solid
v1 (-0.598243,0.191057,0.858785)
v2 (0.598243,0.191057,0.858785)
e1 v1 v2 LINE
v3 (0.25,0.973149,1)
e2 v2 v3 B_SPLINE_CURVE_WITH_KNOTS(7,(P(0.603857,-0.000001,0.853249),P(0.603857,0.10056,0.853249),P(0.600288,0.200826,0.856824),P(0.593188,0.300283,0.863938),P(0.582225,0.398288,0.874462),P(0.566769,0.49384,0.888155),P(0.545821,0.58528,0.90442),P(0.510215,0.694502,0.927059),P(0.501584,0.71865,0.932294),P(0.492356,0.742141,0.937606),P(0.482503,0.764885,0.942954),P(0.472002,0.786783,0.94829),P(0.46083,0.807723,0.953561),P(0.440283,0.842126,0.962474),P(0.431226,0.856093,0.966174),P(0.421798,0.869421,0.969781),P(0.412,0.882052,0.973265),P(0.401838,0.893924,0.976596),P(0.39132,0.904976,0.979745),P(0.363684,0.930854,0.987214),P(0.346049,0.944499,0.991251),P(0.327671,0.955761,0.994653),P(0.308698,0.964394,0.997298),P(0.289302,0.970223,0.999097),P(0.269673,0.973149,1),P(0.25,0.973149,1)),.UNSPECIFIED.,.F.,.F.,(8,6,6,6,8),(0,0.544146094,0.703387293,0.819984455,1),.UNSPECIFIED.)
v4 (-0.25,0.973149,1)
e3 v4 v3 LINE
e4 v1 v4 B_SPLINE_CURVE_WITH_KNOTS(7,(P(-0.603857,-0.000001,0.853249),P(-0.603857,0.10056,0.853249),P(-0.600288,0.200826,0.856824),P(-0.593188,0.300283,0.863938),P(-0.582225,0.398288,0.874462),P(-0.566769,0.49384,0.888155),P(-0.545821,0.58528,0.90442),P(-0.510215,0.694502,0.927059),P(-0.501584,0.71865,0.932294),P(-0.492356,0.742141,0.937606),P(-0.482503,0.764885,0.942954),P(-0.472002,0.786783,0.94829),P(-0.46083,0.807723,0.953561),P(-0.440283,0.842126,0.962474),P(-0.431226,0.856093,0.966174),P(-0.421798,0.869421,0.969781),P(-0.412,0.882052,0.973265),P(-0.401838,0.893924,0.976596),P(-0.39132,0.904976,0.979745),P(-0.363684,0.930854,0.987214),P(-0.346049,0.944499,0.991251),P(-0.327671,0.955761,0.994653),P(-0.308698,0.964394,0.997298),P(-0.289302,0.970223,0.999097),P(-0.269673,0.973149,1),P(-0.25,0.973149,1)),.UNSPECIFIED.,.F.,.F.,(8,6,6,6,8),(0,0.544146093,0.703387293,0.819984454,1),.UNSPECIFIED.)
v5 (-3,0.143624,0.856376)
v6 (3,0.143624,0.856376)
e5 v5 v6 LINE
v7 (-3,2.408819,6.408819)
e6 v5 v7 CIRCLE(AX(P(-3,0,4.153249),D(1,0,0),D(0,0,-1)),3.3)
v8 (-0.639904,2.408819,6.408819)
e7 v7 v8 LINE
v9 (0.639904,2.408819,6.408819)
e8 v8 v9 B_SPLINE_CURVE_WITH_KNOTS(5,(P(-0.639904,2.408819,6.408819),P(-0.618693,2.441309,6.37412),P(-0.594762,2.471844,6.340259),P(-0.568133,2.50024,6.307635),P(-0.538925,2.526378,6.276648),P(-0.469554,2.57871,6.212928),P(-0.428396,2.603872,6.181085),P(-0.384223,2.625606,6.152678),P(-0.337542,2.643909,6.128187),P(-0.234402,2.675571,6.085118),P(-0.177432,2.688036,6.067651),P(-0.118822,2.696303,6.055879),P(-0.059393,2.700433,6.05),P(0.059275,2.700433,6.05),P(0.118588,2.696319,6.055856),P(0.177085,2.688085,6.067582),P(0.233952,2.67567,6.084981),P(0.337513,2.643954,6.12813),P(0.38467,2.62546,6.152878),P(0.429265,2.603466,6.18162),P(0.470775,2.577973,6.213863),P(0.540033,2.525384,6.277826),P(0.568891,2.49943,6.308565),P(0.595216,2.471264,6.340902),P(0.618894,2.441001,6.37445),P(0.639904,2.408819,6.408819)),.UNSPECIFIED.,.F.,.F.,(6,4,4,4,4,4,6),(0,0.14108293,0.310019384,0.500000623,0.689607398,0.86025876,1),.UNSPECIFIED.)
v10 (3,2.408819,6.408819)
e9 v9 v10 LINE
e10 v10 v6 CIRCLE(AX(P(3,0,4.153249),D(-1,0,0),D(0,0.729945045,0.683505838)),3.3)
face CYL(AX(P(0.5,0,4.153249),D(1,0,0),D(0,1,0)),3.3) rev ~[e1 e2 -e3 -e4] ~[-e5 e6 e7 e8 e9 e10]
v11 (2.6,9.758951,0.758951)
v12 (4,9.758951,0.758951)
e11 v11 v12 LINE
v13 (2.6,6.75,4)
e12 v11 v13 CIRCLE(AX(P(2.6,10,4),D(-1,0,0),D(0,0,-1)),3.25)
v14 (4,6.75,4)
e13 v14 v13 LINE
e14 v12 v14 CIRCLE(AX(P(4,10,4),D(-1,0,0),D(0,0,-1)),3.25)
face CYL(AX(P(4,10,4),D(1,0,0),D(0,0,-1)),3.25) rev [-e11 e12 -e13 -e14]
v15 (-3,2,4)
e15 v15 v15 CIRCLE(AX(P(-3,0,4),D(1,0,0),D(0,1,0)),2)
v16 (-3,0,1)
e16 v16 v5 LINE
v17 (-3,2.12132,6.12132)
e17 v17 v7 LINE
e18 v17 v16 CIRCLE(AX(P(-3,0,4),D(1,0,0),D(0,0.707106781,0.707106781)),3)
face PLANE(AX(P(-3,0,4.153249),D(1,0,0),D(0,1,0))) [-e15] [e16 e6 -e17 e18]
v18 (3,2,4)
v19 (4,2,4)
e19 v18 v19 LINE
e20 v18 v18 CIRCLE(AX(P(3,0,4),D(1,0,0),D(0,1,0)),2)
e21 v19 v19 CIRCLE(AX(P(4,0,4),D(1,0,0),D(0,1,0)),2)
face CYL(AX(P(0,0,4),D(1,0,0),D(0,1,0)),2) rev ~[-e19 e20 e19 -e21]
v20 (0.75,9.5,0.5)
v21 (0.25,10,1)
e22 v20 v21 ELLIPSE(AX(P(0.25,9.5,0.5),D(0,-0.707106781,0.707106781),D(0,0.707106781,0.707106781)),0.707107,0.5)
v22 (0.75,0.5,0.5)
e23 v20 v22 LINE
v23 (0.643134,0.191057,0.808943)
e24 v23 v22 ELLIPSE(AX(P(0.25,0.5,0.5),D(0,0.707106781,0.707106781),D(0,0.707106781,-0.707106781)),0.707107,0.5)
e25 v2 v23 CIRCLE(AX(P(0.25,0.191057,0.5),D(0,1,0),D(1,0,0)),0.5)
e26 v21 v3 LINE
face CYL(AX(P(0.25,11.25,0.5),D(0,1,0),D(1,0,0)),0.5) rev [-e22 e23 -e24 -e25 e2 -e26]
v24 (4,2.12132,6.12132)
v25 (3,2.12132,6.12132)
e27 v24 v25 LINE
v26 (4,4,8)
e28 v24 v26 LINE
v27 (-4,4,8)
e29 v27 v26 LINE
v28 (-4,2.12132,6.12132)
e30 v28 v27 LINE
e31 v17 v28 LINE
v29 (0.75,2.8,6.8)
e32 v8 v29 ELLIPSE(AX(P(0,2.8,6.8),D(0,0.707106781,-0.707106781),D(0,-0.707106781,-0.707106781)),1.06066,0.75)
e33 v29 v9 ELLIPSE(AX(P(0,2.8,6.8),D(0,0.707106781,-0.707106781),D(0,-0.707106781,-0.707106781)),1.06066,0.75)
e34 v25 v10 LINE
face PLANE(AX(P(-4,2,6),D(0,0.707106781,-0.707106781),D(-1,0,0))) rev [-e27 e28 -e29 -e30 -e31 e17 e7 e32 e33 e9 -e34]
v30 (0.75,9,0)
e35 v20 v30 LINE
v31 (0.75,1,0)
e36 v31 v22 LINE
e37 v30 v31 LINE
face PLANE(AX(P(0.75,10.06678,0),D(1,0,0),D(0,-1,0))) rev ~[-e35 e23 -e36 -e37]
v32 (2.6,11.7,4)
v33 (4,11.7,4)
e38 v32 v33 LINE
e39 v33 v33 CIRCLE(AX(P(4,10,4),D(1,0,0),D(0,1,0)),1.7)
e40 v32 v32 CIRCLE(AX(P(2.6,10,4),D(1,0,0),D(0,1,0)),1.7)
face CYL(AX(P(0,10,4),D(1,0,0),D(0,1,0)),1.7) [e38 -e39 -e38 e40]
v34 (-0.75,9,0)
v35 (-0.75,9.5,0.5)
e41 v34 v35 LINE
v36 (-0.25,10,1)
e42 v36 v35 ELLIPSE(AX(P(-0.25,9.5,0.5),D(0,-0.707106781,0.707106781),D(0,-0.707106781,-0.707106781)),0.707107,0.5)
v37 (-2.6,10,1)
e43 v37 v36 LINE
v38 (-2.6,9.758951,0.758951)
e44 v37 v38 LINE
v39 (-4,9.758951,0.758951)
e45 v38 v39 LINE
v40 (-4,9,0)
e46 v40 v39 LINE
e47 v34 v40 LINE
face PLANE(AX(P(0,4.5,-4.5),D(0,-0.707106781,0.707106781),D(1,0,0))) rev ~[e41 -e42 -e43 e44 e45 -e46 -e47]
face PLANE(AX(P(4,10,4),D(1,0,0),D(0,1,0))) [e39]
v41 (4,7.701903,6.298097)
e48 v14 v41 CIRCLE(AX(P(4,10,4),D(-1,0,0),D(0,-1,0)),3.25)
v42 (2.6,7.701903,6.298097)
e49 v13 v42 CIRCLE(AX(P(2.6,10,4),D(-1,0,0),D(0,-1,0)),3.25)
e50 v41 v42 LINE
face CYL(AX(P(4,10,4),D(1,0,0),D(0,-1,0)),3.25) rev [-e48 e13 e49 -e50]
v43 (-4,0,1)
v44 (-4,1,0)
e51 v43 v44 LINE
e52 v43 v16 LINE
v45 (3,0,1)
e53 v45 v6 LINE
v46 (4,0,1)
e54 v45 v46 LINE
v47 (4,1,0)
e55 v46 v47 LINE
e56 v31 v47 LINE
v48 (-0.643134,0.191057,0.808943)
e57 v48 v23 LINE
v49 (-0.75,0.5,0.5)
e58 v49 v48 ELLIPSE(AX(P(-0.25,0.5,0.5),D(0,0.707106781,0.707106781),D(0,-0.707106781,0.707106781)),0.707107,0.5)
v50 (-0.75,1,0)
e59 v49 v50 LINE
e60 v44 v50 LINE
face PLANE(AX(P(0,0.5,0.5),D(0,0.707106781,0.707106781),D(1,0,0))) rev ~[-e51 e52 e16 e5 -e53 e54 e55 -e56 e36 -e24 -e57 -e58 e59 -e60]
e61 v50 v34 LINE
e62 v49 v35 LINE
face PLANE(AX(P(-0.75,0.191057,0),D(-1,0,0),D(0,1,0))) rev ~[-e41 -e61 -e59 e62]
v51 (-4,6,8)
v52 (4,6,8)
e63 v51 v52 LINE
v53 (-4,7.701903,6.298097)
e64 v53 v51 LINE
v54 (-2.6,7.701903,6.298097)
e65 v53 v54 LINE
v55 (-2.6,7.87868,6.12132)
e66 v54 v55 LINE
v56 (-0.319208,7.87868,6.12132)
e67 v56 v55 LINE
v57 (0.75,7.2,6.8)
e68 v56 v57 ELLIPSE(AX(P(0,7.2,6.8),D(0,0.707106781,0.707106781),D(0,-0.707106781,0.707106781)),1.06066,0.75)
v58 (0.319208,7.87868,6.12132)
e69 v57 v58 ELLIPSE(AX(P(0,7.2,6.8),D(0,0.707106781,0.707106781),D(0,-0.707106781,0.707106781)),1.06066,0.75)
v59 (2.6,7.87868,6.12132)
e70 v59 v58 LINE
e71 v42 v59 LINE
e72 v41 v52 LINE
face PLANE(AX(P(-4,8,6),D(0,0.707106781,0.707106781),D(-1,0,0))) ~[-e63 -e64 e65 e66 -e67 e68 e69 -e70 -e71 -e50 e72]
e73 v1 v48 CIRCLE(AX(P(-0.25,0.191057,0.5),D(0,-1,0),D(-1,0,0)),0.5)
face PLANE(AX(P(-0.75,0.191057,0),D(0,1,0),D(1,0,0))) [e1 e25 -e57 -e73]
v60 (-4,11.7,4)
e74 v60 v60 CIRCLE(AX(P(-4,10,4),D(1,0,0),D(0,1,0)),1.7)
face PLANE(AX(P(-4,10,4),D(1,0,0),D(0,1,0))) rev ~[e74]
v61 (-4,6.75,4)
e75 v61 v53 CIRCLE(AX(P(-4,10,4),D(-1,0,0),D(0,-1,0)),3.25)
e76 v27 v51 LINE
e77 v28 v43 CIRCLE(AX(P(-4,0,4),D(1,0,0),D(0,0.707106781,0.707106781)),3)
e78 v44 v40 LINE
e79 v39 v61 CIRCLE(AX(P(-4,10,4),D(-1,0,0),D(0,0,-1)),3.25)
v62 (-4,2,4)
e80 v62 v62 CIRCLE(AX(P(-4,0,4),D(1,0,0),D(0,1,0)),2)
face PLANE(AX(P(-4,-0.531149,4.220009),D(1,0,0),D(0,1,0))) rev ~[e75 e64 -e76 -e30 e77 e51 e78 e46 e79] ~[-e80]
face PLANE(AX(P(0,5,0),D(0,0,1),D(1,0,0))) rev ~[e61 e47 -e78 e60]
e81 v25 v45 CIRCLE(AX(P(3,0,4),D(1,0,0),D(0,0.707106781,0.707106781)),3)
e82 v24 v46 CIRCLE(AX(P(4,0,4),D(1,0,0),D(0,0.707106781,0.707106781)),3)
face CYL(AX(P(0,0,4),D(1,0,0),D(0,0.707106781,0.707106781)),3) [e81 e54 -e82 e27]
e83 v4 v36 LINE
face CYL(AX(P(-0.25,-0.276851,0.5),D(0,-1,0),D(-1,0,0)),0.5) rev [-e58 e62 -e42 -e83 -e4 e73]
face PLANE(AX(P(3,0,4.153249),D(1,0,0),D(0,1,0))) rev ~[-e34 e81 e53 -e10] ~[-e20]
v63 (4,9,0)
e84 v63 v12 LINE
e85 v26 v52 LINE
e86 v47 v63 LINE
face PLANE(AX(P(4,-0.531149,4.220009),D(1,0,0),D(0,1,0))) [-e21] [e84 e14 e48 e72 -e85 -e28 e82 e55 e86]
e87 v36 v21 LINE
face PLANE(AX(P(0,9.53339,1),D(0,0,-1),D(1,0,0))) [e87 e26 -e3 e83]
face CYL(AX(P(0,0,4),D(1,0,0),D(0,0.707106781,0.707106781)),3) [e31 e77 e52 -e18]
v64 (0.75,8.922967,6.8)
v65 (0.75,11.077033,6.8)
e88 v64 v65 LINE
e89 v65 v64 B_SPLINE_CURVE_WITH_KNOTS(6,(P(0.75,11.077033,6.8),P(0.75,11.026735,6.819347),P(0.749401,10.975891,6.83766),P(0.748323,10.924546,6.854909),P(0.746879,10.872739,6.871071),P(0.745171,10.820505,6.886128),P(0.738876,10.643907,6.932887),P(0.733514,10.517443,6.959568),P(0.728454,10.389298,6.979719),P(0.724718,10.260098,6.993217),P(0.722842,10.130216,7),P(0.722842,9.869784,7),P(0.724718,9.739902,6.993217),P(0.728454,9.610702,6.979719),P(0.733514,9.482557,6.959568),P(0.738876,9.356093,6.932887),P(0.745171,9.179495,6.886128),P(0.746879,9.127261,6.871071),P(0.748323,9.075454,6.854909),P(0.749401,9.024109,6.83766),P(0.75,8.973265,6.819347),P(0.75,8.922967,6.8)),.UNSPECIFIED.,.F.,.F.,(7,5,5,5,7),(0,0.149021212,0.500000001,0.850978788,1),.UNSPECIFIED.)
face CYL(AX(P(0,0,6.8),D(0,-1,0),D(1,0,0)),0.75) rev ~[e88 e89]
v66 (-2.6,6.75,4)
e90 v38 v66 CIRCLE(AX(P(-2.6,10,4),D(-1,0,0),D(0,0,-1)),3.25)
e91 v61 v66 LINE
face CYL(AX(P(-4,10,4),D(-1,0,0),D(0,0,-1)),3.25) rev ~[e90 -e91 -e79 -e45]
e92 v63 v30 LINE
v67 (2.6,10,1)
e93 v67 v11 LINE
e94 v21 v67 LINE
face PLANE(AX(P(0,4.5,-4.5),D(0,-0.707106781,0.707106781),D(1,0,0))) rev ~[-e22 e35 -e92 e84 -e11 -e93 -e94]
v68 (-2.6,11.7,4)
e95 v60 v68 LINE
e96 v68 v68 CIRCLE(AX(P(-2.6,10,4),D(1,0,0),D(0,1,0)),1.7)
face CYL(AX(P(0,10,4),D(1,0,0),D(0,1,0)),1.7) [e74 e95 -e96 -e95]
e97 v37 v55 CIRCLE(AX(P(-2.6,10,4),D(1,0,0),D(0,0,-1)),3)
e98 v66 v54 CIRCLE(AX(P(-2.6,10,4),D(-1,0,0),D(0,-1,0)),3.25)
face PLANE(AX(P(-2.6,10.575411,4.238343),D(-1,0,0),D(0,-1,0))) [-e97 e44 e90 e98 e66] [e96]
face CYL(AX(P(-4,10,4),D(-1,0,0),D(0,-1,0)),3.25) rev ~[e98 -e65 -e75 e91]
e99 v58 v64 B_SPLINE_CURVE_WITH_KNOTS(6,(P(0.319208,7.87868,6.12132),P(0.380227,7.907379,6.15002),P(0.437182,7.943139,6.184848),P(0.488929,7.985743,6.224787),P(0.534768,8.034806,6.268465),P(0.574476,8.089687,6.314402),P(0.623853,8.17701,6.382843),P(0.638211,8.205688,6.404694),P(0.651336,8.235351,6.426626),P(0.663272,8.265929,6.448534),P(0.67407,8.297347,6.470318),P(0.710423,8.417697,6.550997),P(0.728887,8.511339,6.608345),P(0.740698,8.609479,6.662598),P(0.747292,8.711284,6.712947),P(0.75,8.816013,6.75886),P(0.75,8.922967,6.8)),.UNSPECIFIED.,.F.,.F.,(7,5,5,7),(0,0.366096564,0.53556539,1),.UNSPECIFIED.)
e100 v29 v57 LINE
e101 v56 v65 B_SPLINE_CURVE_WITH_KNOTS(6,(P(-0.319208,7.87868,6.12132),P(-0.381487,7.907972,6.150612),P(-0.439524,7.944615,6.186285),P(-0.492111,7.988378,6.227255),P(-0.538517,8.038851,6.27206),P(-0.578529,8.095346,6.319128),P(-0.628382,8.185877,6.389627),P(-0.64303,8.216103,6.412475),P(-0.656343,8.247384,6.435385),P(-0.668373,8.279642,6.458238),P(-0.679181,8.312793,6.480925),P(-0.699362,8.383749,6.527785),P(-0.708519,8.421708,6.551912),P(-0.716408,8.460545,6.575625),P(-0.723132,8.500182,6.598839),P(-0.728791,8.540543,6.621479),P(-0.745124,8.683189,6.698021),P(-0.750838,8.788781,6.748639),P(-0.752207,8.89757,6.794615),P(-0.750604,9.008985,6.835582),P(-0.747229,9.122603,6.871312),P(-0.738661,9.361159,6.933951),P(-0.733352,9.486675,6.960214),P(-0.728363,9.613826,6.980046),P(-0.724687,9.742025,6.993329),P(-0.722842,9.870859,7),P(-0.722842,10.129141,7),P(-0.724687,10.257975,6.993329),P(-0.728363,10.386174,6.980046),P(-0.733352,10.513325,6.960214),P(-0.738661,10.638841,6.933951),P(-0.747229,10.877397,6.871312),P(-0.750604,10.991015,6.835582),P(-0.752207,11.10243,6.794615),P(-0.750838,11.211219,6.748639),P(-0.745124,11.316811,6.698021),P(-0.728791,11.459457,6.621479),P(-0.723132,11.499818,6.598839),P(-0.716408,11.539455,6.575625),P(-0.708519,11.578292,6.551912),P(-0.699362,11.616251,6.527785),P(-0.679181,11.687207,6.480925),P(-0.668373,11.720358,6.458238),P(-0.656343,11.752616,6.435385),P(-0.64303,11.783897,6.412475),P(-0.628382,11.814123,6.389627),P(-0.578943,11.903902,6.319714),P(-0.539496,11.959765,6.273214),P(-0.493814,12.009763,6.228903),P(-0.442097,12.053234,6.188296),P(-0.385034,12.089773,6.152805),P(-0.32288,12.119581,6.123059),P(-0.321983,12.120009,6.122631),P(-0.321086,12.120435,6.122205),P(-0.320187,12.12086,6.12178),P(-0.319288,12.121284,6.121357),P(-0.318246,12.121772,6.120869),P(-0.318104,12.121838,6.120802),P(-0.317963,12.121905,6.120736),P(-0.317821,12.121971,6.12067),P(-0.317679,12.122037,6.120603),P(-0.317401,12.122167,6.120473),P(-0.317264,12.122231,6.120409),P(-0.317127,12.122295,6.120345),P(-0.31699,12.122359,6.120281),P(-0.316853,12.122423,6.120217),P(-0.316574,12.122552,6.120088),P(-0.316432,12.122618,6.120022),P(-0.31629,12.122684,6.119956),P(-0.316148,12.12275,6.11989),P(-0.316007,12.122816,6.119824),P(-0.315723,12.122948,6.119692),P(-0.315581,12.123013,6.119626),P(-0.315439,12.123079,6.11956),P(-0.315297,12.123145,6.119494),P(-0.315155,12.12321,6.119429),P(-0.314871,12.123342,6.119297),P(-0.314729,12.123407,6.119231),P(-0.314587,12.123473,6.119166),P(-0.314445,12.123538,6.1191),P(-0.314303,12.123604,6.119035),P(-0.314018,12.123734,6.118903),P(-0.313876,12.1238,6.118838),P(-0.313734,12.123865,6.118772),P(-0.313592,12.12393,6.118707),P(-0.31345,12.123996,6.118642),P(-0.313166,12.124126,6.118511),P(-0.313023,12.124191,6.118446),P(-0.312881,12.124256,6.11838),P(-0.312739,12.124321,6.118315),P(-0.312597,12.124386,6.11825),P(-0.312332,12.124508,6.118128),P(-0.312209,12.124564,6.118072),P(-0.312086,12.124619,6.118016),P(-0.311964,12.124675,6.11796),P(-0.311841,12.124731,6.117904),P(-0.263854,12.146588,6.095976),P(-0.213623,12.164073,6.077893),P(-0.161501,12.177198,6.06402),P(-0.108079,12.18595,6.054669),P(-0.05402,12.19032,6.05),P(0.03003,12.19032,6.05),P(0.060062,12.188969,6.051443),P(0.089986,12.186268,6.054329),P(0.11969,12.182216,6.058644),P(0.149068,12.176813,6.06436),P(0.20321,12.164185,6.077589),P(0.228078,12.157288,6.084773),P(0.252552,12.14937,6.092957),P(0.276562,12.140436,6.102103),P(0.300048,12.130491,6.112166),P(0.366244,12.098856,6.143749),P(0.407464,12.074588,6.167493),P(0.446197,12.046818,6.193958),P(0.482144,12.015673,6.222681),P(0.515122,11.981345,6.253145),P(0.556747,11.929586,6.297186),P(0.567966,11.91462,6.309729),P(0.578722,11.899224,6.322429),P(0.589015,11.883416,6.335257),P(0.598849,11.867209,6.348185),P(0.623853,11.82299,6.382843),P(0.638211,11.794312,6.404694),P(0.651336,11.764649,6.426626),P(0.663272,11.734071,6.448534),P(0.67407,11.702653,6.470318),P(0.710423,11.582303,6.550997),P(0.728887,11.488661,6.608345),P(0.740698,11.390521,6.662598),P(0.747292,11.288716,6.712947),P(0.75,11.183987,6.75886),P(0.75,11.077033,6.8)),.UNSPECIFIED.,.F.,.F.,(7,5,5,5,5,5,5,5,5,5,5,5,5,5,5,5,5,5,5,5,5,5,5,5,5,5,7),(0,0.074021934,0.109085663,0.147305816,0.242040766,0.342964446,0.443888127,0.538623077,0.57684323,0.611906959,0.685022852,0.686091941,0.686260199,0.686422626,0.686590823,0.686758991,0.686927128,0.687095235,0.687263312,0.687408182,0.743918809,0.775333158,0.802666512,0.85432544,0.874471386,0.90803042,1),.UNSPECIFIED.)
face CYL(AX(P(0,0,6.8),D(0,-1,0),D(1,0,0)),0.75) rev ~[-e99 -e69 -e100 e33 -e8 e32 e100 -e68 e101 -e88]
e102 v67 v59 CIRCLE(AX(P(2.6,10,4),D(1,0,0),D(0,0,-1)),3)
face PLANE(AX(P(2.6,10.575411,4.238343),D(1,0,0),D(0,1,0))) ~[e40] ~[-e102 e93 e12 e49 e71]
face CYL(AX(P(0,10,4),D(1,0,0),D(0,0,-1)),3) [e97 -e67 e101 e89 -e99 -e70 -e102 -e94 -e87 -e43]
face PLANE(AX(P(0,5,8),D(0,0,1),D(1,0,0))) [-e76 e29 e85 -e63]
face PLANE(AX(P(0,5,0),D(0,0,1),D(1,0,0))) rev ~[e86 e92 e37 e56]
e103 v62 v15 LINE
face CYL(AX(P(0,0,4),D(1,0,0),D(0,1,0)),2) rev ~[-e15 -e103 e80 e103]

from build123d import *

# Parameters (mm, degrees)
F0_W          = 8
F0_H          = 10
F1_DEPTH      = 8
F2_SIZE       = 4
F4_DEPTH      = 4
F5_DEPTH      = 3
F6_R          = 3.3
F7_DEPTH      = 3
F9_DEPTH      = 1.4
F11_R         = 1.7
F12_DEPTH     = 4
F13_R         = 2
F14_DEPTH     = 12.5
F15_T1_DEPTH  = 13.1433659759
F15_T6_DEPTH  = 13.1433659759
F15_S7_R      = 3
F15_T8_DEPTH  = 8
F16_W         = 1.5
F16_H         = 1.0667801354
F16_H_2       = 8
F16_H_3       = 0.8089432385
F17_DEPTH     = 1
F18_T4_DEPTH  = 11.5268513298
F18_S7_R      = 3.3
F18_T8_DEPTH  = 7
F18_T12_DEPTH = 11.5268513298
F18_S14_R     = 3.3
F18_T15_DEPTH = 7
F19_R         = 0.75
F20_DEPTH     = 25


# Not quite as in the source:
# - a fillet or chamfer that OpenCascade refuses, or shapes differently, is made with other operations: its cross-section is extruded or revolved along the edge and cut away or added


with BuildPart() as f1:
    # F0 (on Top) → F1 (new body)
    with BuildSketch(Plane.XY):
        with Locations((0, 5)):
            Rectangle(F0_W, F0_H)
    extrude(amount=F1_DEPTH)

    # F2
    f2_edges = [f1.edges().sort_by_distance(p)[0] for p in [
        (0, 0, 8),
        (0, 10, 8),
    ]]
    chamfer(f2_edges, length=F2_SIZE)

    # F3 (on Right) → F4 (join, symmetric)
    with BuildSketch(Plane.YZ):
        with BuildLine():
            ThreePointArc((2.1213203436, 6.1213203436), (-2.7716385975, 5.1480502971), (0, 1))
            Line((0, 1), (0, 4))
            Line((0, 4), (2.1213203436, 6.1213203436))
        make_face()
    extrude(amount=F4_DEPTH, both=True)

    # F3 (on Right) → F5 (join, symmetric)
    with BuildSketch(Plane.YZ):
        with BuildLine():
            Line((10, 4), (10, 1))
            ThreePointArc((10, 1), (12.1213203436, 1.8786796564), (13, 4))
            ThreePointArc((13, 4), (11.1480502971, 6.7716385975), (7.8786796564, 6.1213203436))
            Line((7.8786796564, 6.1213203436), (10, 4))
        make_face()
    extrude(amount=F5_DEPTH, both=True)

    # F6 (on Right) → F7 (cut, symmetric)
    with BuildSketch(Plane.YZ):
        with Locations((0, 4.1532493821)):
            Circle(F6_R)
    extrude(amount=F7_DEPTH, both=True, mode=Mode.SUBTRACT)

    # F8 (on face) → F9 (cut)
    with BuildSketch(Plane(origin=(-4, 0, 0), x_dir=(0, -1, 0), z_dir=(-1, 0, 0))):
        with BuildLine():
            Line((-10, 4), (-7.7019029611, 6.2980970389))
            ThreePointArc((-7.7019029611, 6.2980970389), (-13.0026084807, 5.2437211552), (-10, 0.75))
            Line((-10, 0.75), (-10, 4))
        make_face()
        with BuildLine():
            ThreePointArc((-10, 0.75), (-7.7019029611, 1.7019029611), (-6.75, 4))
            ThreePointArc((-6.75, 4), (-6.9973915193, 5.2437211552), (-7.7019029611, 6.2980970389))
            Line((-7.7019029611, 6.2980970389), (-10, 4))
            Line((-10, 4), (-10, 0.75))
        make_face()
    extrude(amount=-F9_DEPTH, mode=Mode.SUBTRACT)

    # F10: F1 across plane


with BuildPart() as f1_1:
    add(f1.part)
    add(f1.part.mirror(Plane.YZ), mode=Mode.INTERSECT)

    # F11 (on Right) → F12 (join, symmetric)
    with BuildSketch(Plane.YZ):
        with Locations((10, 4)):
            Circle(F11_R)
    extrude(amount=F12_DEPTH, both=True)

    # F13 (on Right) → F14 (cut, symmetric)
    with BuildSketch(Plane.YZ):
        with Locations((0, 4)):
            Circle(F13_R)
    extrude(amount=F14_DEPTH, both=True, mode=Mode.SUBTRACT)

    # F15: chamfer of 1 on 2 edges, made by hand

    # F15_s2 → F15_t1 (cut)
    with BuildSketch(Plane.YZ.offset(-6.571682988)):
        Polygon((1, 0), (0, 1), (0, 0), align=None)
    extrude(amount=F15_T1_DEPTH, mode=Mode.SUBTRACT)


with BuildPart() as f15_tool4:
    # F15_s5 → F15_t6 (new body)
    with BuildSketch(Plane.YZ.offset(6.571682988)):
        Polygon((9, 0), (10, 1), (10, 0), align=None)
    extrude(amount=-F15_T6_DEPTH)

    # F15_s7 → F15_t8 (cut, symmetric)
    with BuildSketch(Plane.YZ):
        with Locations((10, 4)):
            Circle(F15_S7_R)
    extrude(amount=F15_T8_DEPTH, both=True, mode=Mode.SUBTRACT)


with BuildPart() as f1_2:
    add(f1_1.part)

    # F15_t3: cut F15_tool4
    add(f15_tool4.part, mode=Mode.SUBTRACT)

    # F16 (on face) → F17 (cut)
    with BuildSketch(Plane(origin=(0, 0, 0), x_dir=(1, 0, 0), z_dir=(0, 0, -1))):
        with Locations((0, -9.5333900677)):
            Rectangle(F16_W, F16_H)
        with Locations((0, -5)):
            Rectangle(F16_W, F16_H_2)
        with Locations((0, -0.5955283808)):
            Rectangle(F16_W, F16_H_3)
    extrude(amount=-F17_DEPTH, mode=Mode.SUBTRACT)

    # F18: fillet of radius 0.5 on 2 edges, made by hand


with BuildPart() as f18_tool2:
    # F18_s3 → F18_t4 (new body)
    with BuildSketch(Plane.XZ.offset(0.2768513298)):
        with BuildLine():
            ThreePointArc((-0.75, 0.5), (-0.6035533906, 0.8535533906), (-0.25, 1))
            Line((-0.25, 1), (-0.75, 1))
            Line((-0.75, 1), (-0.75, 0.5))
        make_face()
    extrude(amount=-F18_T4_DEPTH)

    split(bisect_by=Plane(origin=(0, 0.5, 0.5), x_dir=(1, 0, 0), z_dir=(0, 0.7071067812, 0.7071067812)), keep=Keep.TOP)

    split(bisect_by=Plane(origin=(0, 4.5, -4.5), x_dir=(1, 0, 0), z_dir=(0, -0.7071067812, 0.7071067812)), keep=Keep.TOP)

    # F18_s7 → F18_t8 (cut, symmetric)
    with BuildSketch(Plane.YZ.offset(-0.5)):
        with Locations((0, 4.1532493821)):
            Circle(F18_S7_R)
    extrude(amount=F18_T8_DEPTH, both=True, mode=Mode.SUBTRACT)


with BuildPart() as f1_3:
    add(f1_2.part)

    # F18_t1: union F18_tool2
    add(f18_tool2.part)


with BuildPart() as f18_tool10:
    # F18_s11 → F18_t12 (new body)
    with BuildSketch(Plane.XZ.offset(-11.25)):
        with BuildLine():
            ThreePointArc((0.75, 0.5), (0.6035533906, 0.8535533906), (0.25, 1))
            Line((0.25, 1), (0.75, 1))
            Line((0.75, 1), (0.75, 0.5))
        make_face()
    extrude(amount=F18_T12_DEPTH)

    split(bisect_by=Plane(origin=(0, 0.5, 0.5), x_dir=(1, 0, 0), z_dir=(0, 0.7071067812, 0.7071067812)), keep=Keep.TOP)

    # F18_s14 → F18_t15 (cut, symmetric)
    with BuildSketch(Plane.YZ.offset(0.5)):
        with Locations((0, 4.1532493821)):
            Circle(F18_S14_R)
    extrude(amount=F18_T15_DEPTH, both=True, mode=Mode.SUBTRACT)

    split(bisect_by=Plane(origin=(0, 4.5, -4.5), x_dir=(1, 0, 0), z_dir=(0, -0.7071067812, 0.7071067812)), keep=Keep.TOP)


with BuildPart() as f1_4:
    add(f1_3.part)

    # F18_t9: union F18_tool10
    add(f18_tool10.part)

    # F19 (on Front) → F20 (cut)
    with BuildSketch(Plane.XZ):
        with Locations((0, 6.8)):
            Circle(F19_R)
    extrude(amount=-F20_DEPTH, mode=Mode.SUBTRACT)


solid = f1_4.part
